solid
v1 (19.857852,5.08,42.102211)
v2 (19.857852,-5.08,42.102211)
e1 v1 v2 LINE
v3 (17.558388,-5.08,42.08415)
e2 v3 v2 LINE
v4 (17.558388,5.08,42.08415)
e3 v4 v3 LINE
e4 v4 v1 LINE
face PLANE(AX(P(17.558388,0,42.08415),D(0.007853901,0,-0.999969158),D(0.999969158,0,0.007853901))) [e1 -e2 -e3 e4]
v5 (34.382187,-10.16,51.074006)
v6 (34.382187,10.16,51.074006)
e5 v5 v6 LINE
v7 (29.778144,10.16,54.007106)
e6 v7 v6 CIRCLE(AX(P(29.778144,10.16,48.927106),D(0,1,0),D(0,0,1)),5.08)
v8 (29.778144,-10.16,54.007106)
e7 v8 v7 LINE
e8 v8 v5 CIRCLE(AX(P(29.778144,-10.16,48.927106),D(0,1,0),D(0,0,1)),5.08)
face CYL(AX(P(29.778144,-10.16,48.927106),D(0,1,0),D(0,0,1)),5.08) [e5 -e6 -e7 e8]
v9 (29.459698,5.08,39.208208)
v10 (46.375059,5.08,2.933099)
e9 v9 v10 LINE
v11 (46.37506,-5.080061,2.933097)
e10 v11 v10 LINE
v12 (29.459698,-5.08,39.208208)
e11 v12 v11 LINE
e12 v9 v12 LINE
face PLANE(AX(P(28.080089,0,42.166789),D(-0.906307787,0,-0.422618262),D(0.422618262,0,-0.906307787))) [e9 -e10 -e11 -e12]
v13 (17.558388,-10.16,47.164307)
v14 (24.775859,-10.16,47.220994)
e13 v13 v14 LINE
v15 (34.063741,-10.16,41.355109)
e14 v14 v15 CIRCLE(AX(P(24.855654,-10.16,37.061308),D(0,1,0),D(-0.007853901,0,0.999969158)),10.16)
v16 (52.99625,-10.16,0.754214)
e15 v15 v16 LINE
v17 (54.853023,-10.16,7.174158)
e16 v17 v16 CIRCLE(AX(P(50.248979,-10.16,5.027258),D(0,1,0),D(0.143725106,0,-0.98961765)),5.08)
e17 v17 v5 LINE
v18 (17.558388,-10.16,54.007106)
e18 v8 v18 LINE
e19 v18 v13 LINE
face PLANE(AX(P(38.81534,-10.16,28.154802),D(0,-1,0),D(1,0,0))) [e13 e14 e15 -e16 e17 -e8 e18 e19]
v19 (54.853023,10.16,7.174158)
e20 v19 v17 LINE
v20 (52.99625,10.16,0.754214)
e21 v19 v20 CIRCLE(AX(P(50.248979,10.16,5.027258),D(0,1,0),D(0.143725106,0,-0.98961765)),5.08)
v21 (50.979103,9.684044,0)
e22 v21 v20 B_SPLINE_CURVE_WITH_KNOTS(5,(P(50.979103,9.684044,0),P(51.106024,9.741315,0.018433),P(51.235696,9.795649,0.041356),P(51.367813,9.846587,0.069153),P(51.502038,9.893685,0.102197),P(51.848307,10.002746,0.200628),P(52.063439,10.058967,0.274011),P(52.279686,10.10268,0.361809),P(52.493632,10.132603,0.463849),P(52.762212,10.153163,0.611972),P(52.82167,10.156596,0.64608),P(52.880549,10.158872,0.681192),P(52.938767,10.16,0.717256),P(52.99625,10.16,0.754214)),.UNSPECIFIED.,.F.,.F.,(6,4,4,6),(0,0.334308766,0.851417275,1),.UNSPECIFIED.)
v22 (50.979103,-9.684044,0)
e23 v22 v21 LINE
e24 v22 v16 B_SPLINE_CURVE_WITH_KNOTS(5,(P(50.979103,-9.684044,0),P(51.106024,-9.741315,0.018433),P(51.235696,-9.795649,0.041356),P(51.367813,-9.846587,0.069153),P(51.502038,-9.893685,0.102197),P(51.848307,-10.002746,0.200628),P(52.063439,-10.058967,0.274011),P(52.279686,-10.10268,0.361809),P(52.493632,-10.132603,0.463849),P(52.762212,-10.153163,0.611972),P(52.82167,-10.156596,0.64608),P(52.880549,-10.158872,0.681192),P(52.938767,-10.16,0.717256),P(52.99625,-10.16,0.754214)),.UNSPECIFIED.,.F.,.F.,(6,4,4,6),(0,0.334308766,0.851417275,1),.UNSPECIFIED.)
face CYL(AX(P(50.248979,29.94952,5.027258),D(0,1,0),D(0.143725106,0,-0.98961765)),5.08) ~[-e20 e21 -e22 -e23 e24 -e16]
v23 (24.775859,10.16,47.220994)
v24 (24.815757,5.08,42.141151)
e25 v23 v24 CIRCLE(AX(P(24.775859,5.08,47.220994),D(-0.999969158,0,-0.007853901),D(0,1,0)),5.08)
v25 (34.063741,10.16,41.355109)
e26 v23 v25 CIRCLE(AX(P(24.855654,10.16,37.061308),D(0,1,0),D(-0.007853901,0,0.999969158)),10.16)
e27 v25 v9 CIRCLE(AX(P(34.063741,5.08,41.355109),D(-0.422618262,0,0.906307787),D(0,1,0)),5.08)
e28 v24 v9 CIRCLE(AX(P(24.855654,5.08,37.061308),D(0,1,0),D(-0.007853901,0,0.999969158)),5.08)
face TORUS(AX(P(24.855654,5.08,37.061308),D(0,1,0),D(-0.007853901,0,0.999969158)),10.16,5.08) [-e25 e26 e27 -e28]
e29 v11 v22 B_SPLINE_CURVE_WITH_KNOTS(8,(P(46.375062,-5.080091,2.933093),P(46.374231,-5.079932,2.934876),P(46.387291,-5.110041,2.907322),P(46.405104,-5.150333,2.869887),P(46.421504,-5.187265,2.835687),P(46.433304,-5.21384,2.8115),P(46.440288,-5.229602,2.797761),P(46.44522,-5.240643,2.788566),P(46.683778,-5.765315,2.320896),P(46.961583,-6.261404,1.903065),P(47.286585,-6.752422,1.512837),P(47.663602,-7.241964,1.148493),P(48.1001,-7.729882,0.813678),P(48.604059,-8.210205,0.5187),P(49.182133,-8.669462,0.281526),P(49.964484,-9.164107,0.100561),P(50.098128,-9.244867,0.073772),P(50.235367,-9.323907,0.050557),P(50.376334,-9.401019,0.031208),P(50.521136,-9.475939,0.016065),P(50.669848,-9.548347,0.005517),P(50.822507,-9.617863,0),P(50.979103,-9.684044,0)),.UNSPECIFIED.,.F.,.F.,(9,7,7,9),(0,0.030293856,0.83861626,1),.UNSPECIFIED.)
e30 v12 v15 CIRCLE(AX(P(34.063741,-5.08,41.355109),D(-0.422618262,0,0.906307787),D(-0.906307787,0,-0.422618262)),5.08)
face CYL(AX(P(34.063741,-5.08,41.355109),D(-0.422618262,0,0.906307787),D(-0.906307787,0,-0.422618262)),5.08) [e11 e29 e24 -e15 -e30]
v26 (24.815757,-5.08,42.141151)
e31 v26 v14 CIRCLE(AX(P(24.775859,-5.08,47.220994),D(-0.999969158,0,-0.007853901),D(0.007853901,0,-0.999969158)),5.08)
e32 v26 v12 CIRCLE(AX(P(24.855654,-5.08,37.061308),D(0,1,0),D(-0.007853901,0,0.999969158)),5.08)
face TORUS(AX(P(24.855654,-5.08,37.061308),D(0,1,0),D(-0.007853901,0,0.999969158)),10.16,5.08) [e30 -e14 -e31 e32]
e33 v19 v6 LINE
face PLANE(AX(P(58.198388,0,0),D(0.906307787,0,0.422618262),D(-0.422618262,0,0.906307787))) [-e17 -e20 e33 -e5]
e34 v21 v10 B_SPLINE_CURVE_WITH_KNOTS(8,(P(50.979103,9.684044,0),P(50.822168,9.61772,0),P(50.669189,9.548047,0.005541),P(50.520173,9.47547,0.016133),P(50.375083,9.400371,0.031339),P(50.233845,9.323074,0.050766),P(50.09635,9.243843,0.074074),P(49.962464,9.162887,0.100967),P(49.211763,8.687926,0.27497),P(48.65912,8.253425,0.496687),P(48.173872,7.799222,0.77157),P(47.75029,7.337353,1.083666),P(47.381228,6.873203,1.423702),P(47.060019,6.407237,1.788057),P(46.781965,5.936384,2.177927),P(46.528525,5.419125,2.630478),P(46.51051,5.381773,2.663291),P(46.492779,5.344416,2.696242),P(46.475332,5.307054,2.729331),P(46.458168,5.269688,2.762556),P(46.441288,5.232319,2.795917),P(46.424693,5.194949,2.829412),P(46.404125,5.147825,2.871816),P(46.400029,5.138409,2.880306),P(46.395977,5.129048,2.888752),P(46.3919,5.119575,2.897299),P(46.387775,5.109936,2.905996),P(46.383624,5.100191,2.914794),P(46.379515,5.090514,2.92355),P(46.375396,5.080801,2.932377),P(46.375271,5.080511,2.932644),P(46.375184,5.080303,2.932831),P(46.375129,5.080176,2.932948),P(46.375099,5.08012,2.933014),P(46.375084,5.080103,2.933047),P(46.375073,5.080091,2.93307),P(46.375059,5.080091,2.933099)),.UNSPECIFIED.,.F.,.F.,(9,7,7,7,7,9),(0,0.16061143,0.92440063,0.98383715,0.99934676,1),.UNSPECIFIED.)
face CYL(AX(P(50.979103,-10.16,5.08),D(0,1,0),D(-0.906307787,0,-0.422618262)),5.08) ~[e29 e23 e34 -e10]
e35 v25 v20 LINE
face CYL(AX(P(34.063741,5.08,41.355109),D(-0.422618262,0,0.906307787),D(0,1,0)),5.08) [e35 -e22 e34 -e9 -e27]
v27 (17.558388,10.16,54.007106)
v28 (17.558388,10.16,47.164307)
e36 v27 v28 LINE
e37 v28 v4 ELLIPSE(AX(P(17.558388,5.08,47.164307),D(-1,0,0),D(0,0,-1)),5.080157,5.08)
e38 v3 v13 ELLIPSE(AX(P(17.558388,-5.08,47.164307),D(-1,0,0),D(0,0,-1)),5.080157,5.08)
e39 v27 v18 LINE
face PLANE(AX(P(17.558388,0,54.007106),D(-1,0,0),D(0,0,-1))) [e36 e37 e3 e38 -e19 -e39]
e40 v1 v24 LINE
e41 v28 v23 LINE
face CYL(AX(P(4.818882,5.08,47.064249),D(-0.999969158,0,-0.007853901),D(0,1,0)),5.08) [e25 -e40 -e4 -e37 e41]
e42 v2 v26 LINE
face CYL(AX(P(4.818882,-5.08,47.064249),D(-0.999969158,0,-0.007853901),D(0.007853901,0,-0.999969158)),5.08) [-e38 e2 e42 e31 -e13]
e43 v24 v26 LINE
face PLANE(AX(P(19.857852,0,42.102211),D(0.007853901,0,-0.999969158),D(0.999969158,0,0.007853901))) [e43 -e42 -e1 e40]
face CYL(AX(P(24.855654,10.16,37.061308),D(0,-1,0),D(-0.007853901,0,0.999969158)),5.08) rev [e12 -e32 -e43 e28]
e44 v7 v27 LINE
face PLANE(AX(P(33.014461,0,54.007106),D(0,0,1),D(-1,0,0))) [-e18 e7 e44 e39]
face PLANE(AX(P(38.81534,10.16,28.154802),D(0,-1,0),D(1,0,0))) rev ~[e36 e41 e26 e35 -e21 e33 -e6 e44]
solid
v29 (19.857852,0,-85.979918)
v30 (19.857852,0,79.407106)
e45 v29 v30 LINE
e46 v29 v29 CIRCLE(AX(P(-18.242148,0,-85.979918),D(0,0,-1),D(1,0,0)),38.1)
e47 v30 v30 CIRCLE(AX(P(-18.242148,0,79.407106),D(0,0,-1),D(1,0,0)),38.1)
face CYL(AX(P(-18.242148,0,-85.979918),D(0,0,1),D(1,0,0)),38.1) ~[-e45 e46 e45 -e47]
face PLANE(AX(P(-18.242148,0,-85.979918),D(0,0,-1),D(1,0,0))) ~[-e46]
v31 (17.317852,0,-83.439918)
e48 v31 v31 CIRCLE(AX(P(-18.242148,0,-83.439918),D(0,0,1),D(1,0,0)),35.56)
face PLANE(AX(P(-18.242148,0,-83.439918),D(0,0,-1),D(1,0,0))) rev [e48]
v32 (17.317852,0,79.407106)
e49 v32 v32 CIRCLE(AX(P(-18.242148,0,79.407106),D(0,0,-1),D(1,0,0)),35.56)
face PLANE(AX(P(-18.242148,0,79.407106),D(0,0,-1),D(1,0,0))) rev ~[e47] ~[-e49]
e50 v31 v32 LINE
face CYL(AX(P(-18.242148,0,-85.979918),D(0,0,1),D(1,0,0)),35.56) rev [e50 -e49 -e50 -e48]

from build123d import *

# Parameters (mm, degrees)
F2_DEPTH    = 10.16
F3_R        = 5.08
F4_T        = -2.54
F5_R        = 5.08
F6_R        = 5.08
F7_T1_DEPTH = 59.8990400144
F9_T1_DEPTH = 52.7251544051
F9_T3_DEPTH = 19.9575926883
F9_T6_ANGLE = 65.45
F9_T8_ANGLE = 65.45


# Not quite as in the source:
# - a fillet or chamfer that OpenCascade refuses, or shapes differently, is made with other operations: its cross-section is extruded or revolved along the edge and cut away or added
# - a feature of the source that left no trace in its solid (it failed there, or was rolled back) is left out


with BuildPart() as f1:
    # F0 (on Front) → F1 (revolve)
    with BuildSketch(Plane.XZ):
        Polygon((19.8578521456, 79.4071055293), (-18.2421478544, 79.4071055293), (-18.2421478544, -85.9799182087), (19.8578521456, -85.9799182087), (19.8578521456, 42.1022108057), (17.5583876607, 42.0841504825), (17.5583876607, 54.0071055293), (19.8578521456, 54.0071055293), align=None)
        Polygon((19.8578521456, 42.1022108057), (19.8578521456, 54.0071055293), (17.5583876607, 54.0071055293), (17.5583876607, 42.0841504825), align=None)
    revolve(axis=Axis((-18.2421478544, 0, -3.2864063397), (0, 0, -1)))

    # F4
    f4_openings = [f1.faces().sort_by_distance(p)[0] for p in [
        (-18.242148, 0, 79.407106),
    ]]
    offset(amount=F4_T, openings=f4_openings)


with BuildPart() as f2:
    # F0 (on Front) → F2 (new body, symmetric)
    with BuildSketch(Plane.XZ):
        Polygon((33.0144607576, 54.0071055293), (19.8578521456, 54.0071055293), (19.8578521456, 42.1022108057), (28.0800888653, 42.1667894297), (47.7427856962, 0), (58.1983876607, 0), align=None)
        Polygon((19.8578521456, 42.1022108057), (19.8578521456, 54.0071055293), (17.5583876607, 54.0071055293), (17.5583876607, 42.0841504825), align=None)
    extrude(amount=F2_DEPTH, both=True)

    # F3
    f3_edges = [f2.edges().sort_by_distance(p)[0] for p in [
        (33.014461, 0, 54.007106),
    ]]
    fillet(f3_edges, radius=F3_R)

    # F5
    f5_edges = [f2.edges().sort_by_distance(p)[0] for p in [
        (28.080089, 0, 42.166789),
    ]]
    fillet(f5_edges, radius=F5_R)

    # F6
    f6_edges = [f2.edges().sort_by_distance(p)[0] for p in [
        (47.742786, 0, 0),
    ]]
    fillet(f6_edges, radius=F6_R)

    # F7: fillet of radius 5.08 on 1 edges, made by hand

    # F7_s2 → F7_t1 (cut)
    with BuildSketch(Plane.XZ.offset(-29.9495200072)):
        with BuildLine():
            ThreePointArc((50.9791026211, 0), (54.7189312044, 2.6135617341), (54.8530226422, 7.1741584337))
            Line((54.8530226422, 7.1741584337), (58.1983876607, 0))
            Line((58.1983876607, 0), (50.9791026211, 0))
        make_face()
    extrude(amount=F7_T1_DEPTH, mode=Mode.SUBTRACT)

    # F9: fillet of radius 5.08 on 6 edges, made by hand

    # F9_s2 → F9_t1 (cut)
    with BuildSketch(Plane(origin=(-9.7559305144, 0, 20.9216605042), x_dir=(0, 1, 0), z_dir=(0.4226182617, 0, -0.906307787))):
        with BuildLine():
            ThreePointArc((10.16, 48.3496584513), (8.6721024484, 44.7575560028), (5.08, 43.2696584513))
            Line((5.08, 43.2696584513), (10.16, 43.2696584513))
            Line((10.16, 43.2696584513), (10.16, 48.3496584513))
        make_face()
        with BuildLine():
            ThreePointArc((-5.08, 43.2696584513), (-8.6721024484, 44.7575560028), (-10.16, 48.3496584513))
            Line((-10.16, 48.3496584513), (-10.16, 43.2696584513))
            Line((-10.16, 43.2696584513), (-5.08, 43.2696584513))
        make_face()
    extrude(amount=F9_T1_DEPTH, mode=Mode.SUBTRACT)

    # F9_s4 → F9_t3 (cut)
    with BuildSketch(Plane(origin=(5.1882108439, 0, 0.0407489506), x_dir=(0, 1, 0), z_dir=(0.9999691576, 0, 0.0078539009))):
        with BuildLine():
            ThreePointArc((10.16, 47.0249506718), (8.6721024484, 43.4328482233), (5.08, 41.9449506718))
            Line((5.08, 41.9449506718), (10.16, 41.9449506718))
            Line((10.16, 41.9449506718), (10.16, 47.0249506718))
        make_face()
        with BuildLine():
            ThreePointArc((-5.08, 41.9449506718), (-8.6721024484, 43.4328482233), (-10.16, 47.0249506718))
            Line((-10.16, 47.0249506718), (-10.16, 41.9449506718))
            Line((-10.16, 41.9449506718), (-5.08, 41.9449506718))
        make_face()
    extrude(amount=F9_T3_DEPTH, mode=Mode.SUBTRACT)

    # F9_s5 → F9_t6 (revolve, cut)
    with BuildSketch(Plane(origin=(25.1451879931, 0, 0.1974939055), x_dir=(0, 1, 0), z_dir=(-0.9999691576, 0, -0.0078539009))):
        with BuildLine():
            ThreePointArc((10.16, -47.0249506718), (8.6721024484, -43.4328482233), (5.08, -41.9449506718))
            Line((5.08, -41.9449506718), (10.16, -41.9449506718))
            Line((10.16, -41.9449506718), (10.16, -47.0249506718))
        make_face()
    revolve(axis=Axis((24.8556543242, 10.16, 37.0613075754), (0, 1, 0)), revolution_arc=F9_T6_ANGLE, mode=Mode.SUBTRACT)

    # F9_s7 → F9_t8 (revolve, cut)
    with BuildSketch(Plane(origin=(25.1451879931, 0, 0.1974939055), x_dir=(0, 1, 0), z_dir=(-0.9999691576, 0, -0.0078539009))):
        with BuildLine():
            ThreePointArc((-5.08, -41.9449506718), (-8.6721024484, -43.4328482233), (-10.16, -47.0249506718))
            Line((-10.16, -47.0249506718), (-10.16, -41.9449506718))
            Line((-10.16, -41.9449506718), (-5.08, -41.9449506718))
        make_face()
    revolve(axis=Axis((24.8556543242, -10.16, 37.0613075754), (0, 1, 0)), revolution_arc=F9_T8_ANGLE, mode=Mode.SUBTRACT)


solid = Compound([f1.part, f2.part])
